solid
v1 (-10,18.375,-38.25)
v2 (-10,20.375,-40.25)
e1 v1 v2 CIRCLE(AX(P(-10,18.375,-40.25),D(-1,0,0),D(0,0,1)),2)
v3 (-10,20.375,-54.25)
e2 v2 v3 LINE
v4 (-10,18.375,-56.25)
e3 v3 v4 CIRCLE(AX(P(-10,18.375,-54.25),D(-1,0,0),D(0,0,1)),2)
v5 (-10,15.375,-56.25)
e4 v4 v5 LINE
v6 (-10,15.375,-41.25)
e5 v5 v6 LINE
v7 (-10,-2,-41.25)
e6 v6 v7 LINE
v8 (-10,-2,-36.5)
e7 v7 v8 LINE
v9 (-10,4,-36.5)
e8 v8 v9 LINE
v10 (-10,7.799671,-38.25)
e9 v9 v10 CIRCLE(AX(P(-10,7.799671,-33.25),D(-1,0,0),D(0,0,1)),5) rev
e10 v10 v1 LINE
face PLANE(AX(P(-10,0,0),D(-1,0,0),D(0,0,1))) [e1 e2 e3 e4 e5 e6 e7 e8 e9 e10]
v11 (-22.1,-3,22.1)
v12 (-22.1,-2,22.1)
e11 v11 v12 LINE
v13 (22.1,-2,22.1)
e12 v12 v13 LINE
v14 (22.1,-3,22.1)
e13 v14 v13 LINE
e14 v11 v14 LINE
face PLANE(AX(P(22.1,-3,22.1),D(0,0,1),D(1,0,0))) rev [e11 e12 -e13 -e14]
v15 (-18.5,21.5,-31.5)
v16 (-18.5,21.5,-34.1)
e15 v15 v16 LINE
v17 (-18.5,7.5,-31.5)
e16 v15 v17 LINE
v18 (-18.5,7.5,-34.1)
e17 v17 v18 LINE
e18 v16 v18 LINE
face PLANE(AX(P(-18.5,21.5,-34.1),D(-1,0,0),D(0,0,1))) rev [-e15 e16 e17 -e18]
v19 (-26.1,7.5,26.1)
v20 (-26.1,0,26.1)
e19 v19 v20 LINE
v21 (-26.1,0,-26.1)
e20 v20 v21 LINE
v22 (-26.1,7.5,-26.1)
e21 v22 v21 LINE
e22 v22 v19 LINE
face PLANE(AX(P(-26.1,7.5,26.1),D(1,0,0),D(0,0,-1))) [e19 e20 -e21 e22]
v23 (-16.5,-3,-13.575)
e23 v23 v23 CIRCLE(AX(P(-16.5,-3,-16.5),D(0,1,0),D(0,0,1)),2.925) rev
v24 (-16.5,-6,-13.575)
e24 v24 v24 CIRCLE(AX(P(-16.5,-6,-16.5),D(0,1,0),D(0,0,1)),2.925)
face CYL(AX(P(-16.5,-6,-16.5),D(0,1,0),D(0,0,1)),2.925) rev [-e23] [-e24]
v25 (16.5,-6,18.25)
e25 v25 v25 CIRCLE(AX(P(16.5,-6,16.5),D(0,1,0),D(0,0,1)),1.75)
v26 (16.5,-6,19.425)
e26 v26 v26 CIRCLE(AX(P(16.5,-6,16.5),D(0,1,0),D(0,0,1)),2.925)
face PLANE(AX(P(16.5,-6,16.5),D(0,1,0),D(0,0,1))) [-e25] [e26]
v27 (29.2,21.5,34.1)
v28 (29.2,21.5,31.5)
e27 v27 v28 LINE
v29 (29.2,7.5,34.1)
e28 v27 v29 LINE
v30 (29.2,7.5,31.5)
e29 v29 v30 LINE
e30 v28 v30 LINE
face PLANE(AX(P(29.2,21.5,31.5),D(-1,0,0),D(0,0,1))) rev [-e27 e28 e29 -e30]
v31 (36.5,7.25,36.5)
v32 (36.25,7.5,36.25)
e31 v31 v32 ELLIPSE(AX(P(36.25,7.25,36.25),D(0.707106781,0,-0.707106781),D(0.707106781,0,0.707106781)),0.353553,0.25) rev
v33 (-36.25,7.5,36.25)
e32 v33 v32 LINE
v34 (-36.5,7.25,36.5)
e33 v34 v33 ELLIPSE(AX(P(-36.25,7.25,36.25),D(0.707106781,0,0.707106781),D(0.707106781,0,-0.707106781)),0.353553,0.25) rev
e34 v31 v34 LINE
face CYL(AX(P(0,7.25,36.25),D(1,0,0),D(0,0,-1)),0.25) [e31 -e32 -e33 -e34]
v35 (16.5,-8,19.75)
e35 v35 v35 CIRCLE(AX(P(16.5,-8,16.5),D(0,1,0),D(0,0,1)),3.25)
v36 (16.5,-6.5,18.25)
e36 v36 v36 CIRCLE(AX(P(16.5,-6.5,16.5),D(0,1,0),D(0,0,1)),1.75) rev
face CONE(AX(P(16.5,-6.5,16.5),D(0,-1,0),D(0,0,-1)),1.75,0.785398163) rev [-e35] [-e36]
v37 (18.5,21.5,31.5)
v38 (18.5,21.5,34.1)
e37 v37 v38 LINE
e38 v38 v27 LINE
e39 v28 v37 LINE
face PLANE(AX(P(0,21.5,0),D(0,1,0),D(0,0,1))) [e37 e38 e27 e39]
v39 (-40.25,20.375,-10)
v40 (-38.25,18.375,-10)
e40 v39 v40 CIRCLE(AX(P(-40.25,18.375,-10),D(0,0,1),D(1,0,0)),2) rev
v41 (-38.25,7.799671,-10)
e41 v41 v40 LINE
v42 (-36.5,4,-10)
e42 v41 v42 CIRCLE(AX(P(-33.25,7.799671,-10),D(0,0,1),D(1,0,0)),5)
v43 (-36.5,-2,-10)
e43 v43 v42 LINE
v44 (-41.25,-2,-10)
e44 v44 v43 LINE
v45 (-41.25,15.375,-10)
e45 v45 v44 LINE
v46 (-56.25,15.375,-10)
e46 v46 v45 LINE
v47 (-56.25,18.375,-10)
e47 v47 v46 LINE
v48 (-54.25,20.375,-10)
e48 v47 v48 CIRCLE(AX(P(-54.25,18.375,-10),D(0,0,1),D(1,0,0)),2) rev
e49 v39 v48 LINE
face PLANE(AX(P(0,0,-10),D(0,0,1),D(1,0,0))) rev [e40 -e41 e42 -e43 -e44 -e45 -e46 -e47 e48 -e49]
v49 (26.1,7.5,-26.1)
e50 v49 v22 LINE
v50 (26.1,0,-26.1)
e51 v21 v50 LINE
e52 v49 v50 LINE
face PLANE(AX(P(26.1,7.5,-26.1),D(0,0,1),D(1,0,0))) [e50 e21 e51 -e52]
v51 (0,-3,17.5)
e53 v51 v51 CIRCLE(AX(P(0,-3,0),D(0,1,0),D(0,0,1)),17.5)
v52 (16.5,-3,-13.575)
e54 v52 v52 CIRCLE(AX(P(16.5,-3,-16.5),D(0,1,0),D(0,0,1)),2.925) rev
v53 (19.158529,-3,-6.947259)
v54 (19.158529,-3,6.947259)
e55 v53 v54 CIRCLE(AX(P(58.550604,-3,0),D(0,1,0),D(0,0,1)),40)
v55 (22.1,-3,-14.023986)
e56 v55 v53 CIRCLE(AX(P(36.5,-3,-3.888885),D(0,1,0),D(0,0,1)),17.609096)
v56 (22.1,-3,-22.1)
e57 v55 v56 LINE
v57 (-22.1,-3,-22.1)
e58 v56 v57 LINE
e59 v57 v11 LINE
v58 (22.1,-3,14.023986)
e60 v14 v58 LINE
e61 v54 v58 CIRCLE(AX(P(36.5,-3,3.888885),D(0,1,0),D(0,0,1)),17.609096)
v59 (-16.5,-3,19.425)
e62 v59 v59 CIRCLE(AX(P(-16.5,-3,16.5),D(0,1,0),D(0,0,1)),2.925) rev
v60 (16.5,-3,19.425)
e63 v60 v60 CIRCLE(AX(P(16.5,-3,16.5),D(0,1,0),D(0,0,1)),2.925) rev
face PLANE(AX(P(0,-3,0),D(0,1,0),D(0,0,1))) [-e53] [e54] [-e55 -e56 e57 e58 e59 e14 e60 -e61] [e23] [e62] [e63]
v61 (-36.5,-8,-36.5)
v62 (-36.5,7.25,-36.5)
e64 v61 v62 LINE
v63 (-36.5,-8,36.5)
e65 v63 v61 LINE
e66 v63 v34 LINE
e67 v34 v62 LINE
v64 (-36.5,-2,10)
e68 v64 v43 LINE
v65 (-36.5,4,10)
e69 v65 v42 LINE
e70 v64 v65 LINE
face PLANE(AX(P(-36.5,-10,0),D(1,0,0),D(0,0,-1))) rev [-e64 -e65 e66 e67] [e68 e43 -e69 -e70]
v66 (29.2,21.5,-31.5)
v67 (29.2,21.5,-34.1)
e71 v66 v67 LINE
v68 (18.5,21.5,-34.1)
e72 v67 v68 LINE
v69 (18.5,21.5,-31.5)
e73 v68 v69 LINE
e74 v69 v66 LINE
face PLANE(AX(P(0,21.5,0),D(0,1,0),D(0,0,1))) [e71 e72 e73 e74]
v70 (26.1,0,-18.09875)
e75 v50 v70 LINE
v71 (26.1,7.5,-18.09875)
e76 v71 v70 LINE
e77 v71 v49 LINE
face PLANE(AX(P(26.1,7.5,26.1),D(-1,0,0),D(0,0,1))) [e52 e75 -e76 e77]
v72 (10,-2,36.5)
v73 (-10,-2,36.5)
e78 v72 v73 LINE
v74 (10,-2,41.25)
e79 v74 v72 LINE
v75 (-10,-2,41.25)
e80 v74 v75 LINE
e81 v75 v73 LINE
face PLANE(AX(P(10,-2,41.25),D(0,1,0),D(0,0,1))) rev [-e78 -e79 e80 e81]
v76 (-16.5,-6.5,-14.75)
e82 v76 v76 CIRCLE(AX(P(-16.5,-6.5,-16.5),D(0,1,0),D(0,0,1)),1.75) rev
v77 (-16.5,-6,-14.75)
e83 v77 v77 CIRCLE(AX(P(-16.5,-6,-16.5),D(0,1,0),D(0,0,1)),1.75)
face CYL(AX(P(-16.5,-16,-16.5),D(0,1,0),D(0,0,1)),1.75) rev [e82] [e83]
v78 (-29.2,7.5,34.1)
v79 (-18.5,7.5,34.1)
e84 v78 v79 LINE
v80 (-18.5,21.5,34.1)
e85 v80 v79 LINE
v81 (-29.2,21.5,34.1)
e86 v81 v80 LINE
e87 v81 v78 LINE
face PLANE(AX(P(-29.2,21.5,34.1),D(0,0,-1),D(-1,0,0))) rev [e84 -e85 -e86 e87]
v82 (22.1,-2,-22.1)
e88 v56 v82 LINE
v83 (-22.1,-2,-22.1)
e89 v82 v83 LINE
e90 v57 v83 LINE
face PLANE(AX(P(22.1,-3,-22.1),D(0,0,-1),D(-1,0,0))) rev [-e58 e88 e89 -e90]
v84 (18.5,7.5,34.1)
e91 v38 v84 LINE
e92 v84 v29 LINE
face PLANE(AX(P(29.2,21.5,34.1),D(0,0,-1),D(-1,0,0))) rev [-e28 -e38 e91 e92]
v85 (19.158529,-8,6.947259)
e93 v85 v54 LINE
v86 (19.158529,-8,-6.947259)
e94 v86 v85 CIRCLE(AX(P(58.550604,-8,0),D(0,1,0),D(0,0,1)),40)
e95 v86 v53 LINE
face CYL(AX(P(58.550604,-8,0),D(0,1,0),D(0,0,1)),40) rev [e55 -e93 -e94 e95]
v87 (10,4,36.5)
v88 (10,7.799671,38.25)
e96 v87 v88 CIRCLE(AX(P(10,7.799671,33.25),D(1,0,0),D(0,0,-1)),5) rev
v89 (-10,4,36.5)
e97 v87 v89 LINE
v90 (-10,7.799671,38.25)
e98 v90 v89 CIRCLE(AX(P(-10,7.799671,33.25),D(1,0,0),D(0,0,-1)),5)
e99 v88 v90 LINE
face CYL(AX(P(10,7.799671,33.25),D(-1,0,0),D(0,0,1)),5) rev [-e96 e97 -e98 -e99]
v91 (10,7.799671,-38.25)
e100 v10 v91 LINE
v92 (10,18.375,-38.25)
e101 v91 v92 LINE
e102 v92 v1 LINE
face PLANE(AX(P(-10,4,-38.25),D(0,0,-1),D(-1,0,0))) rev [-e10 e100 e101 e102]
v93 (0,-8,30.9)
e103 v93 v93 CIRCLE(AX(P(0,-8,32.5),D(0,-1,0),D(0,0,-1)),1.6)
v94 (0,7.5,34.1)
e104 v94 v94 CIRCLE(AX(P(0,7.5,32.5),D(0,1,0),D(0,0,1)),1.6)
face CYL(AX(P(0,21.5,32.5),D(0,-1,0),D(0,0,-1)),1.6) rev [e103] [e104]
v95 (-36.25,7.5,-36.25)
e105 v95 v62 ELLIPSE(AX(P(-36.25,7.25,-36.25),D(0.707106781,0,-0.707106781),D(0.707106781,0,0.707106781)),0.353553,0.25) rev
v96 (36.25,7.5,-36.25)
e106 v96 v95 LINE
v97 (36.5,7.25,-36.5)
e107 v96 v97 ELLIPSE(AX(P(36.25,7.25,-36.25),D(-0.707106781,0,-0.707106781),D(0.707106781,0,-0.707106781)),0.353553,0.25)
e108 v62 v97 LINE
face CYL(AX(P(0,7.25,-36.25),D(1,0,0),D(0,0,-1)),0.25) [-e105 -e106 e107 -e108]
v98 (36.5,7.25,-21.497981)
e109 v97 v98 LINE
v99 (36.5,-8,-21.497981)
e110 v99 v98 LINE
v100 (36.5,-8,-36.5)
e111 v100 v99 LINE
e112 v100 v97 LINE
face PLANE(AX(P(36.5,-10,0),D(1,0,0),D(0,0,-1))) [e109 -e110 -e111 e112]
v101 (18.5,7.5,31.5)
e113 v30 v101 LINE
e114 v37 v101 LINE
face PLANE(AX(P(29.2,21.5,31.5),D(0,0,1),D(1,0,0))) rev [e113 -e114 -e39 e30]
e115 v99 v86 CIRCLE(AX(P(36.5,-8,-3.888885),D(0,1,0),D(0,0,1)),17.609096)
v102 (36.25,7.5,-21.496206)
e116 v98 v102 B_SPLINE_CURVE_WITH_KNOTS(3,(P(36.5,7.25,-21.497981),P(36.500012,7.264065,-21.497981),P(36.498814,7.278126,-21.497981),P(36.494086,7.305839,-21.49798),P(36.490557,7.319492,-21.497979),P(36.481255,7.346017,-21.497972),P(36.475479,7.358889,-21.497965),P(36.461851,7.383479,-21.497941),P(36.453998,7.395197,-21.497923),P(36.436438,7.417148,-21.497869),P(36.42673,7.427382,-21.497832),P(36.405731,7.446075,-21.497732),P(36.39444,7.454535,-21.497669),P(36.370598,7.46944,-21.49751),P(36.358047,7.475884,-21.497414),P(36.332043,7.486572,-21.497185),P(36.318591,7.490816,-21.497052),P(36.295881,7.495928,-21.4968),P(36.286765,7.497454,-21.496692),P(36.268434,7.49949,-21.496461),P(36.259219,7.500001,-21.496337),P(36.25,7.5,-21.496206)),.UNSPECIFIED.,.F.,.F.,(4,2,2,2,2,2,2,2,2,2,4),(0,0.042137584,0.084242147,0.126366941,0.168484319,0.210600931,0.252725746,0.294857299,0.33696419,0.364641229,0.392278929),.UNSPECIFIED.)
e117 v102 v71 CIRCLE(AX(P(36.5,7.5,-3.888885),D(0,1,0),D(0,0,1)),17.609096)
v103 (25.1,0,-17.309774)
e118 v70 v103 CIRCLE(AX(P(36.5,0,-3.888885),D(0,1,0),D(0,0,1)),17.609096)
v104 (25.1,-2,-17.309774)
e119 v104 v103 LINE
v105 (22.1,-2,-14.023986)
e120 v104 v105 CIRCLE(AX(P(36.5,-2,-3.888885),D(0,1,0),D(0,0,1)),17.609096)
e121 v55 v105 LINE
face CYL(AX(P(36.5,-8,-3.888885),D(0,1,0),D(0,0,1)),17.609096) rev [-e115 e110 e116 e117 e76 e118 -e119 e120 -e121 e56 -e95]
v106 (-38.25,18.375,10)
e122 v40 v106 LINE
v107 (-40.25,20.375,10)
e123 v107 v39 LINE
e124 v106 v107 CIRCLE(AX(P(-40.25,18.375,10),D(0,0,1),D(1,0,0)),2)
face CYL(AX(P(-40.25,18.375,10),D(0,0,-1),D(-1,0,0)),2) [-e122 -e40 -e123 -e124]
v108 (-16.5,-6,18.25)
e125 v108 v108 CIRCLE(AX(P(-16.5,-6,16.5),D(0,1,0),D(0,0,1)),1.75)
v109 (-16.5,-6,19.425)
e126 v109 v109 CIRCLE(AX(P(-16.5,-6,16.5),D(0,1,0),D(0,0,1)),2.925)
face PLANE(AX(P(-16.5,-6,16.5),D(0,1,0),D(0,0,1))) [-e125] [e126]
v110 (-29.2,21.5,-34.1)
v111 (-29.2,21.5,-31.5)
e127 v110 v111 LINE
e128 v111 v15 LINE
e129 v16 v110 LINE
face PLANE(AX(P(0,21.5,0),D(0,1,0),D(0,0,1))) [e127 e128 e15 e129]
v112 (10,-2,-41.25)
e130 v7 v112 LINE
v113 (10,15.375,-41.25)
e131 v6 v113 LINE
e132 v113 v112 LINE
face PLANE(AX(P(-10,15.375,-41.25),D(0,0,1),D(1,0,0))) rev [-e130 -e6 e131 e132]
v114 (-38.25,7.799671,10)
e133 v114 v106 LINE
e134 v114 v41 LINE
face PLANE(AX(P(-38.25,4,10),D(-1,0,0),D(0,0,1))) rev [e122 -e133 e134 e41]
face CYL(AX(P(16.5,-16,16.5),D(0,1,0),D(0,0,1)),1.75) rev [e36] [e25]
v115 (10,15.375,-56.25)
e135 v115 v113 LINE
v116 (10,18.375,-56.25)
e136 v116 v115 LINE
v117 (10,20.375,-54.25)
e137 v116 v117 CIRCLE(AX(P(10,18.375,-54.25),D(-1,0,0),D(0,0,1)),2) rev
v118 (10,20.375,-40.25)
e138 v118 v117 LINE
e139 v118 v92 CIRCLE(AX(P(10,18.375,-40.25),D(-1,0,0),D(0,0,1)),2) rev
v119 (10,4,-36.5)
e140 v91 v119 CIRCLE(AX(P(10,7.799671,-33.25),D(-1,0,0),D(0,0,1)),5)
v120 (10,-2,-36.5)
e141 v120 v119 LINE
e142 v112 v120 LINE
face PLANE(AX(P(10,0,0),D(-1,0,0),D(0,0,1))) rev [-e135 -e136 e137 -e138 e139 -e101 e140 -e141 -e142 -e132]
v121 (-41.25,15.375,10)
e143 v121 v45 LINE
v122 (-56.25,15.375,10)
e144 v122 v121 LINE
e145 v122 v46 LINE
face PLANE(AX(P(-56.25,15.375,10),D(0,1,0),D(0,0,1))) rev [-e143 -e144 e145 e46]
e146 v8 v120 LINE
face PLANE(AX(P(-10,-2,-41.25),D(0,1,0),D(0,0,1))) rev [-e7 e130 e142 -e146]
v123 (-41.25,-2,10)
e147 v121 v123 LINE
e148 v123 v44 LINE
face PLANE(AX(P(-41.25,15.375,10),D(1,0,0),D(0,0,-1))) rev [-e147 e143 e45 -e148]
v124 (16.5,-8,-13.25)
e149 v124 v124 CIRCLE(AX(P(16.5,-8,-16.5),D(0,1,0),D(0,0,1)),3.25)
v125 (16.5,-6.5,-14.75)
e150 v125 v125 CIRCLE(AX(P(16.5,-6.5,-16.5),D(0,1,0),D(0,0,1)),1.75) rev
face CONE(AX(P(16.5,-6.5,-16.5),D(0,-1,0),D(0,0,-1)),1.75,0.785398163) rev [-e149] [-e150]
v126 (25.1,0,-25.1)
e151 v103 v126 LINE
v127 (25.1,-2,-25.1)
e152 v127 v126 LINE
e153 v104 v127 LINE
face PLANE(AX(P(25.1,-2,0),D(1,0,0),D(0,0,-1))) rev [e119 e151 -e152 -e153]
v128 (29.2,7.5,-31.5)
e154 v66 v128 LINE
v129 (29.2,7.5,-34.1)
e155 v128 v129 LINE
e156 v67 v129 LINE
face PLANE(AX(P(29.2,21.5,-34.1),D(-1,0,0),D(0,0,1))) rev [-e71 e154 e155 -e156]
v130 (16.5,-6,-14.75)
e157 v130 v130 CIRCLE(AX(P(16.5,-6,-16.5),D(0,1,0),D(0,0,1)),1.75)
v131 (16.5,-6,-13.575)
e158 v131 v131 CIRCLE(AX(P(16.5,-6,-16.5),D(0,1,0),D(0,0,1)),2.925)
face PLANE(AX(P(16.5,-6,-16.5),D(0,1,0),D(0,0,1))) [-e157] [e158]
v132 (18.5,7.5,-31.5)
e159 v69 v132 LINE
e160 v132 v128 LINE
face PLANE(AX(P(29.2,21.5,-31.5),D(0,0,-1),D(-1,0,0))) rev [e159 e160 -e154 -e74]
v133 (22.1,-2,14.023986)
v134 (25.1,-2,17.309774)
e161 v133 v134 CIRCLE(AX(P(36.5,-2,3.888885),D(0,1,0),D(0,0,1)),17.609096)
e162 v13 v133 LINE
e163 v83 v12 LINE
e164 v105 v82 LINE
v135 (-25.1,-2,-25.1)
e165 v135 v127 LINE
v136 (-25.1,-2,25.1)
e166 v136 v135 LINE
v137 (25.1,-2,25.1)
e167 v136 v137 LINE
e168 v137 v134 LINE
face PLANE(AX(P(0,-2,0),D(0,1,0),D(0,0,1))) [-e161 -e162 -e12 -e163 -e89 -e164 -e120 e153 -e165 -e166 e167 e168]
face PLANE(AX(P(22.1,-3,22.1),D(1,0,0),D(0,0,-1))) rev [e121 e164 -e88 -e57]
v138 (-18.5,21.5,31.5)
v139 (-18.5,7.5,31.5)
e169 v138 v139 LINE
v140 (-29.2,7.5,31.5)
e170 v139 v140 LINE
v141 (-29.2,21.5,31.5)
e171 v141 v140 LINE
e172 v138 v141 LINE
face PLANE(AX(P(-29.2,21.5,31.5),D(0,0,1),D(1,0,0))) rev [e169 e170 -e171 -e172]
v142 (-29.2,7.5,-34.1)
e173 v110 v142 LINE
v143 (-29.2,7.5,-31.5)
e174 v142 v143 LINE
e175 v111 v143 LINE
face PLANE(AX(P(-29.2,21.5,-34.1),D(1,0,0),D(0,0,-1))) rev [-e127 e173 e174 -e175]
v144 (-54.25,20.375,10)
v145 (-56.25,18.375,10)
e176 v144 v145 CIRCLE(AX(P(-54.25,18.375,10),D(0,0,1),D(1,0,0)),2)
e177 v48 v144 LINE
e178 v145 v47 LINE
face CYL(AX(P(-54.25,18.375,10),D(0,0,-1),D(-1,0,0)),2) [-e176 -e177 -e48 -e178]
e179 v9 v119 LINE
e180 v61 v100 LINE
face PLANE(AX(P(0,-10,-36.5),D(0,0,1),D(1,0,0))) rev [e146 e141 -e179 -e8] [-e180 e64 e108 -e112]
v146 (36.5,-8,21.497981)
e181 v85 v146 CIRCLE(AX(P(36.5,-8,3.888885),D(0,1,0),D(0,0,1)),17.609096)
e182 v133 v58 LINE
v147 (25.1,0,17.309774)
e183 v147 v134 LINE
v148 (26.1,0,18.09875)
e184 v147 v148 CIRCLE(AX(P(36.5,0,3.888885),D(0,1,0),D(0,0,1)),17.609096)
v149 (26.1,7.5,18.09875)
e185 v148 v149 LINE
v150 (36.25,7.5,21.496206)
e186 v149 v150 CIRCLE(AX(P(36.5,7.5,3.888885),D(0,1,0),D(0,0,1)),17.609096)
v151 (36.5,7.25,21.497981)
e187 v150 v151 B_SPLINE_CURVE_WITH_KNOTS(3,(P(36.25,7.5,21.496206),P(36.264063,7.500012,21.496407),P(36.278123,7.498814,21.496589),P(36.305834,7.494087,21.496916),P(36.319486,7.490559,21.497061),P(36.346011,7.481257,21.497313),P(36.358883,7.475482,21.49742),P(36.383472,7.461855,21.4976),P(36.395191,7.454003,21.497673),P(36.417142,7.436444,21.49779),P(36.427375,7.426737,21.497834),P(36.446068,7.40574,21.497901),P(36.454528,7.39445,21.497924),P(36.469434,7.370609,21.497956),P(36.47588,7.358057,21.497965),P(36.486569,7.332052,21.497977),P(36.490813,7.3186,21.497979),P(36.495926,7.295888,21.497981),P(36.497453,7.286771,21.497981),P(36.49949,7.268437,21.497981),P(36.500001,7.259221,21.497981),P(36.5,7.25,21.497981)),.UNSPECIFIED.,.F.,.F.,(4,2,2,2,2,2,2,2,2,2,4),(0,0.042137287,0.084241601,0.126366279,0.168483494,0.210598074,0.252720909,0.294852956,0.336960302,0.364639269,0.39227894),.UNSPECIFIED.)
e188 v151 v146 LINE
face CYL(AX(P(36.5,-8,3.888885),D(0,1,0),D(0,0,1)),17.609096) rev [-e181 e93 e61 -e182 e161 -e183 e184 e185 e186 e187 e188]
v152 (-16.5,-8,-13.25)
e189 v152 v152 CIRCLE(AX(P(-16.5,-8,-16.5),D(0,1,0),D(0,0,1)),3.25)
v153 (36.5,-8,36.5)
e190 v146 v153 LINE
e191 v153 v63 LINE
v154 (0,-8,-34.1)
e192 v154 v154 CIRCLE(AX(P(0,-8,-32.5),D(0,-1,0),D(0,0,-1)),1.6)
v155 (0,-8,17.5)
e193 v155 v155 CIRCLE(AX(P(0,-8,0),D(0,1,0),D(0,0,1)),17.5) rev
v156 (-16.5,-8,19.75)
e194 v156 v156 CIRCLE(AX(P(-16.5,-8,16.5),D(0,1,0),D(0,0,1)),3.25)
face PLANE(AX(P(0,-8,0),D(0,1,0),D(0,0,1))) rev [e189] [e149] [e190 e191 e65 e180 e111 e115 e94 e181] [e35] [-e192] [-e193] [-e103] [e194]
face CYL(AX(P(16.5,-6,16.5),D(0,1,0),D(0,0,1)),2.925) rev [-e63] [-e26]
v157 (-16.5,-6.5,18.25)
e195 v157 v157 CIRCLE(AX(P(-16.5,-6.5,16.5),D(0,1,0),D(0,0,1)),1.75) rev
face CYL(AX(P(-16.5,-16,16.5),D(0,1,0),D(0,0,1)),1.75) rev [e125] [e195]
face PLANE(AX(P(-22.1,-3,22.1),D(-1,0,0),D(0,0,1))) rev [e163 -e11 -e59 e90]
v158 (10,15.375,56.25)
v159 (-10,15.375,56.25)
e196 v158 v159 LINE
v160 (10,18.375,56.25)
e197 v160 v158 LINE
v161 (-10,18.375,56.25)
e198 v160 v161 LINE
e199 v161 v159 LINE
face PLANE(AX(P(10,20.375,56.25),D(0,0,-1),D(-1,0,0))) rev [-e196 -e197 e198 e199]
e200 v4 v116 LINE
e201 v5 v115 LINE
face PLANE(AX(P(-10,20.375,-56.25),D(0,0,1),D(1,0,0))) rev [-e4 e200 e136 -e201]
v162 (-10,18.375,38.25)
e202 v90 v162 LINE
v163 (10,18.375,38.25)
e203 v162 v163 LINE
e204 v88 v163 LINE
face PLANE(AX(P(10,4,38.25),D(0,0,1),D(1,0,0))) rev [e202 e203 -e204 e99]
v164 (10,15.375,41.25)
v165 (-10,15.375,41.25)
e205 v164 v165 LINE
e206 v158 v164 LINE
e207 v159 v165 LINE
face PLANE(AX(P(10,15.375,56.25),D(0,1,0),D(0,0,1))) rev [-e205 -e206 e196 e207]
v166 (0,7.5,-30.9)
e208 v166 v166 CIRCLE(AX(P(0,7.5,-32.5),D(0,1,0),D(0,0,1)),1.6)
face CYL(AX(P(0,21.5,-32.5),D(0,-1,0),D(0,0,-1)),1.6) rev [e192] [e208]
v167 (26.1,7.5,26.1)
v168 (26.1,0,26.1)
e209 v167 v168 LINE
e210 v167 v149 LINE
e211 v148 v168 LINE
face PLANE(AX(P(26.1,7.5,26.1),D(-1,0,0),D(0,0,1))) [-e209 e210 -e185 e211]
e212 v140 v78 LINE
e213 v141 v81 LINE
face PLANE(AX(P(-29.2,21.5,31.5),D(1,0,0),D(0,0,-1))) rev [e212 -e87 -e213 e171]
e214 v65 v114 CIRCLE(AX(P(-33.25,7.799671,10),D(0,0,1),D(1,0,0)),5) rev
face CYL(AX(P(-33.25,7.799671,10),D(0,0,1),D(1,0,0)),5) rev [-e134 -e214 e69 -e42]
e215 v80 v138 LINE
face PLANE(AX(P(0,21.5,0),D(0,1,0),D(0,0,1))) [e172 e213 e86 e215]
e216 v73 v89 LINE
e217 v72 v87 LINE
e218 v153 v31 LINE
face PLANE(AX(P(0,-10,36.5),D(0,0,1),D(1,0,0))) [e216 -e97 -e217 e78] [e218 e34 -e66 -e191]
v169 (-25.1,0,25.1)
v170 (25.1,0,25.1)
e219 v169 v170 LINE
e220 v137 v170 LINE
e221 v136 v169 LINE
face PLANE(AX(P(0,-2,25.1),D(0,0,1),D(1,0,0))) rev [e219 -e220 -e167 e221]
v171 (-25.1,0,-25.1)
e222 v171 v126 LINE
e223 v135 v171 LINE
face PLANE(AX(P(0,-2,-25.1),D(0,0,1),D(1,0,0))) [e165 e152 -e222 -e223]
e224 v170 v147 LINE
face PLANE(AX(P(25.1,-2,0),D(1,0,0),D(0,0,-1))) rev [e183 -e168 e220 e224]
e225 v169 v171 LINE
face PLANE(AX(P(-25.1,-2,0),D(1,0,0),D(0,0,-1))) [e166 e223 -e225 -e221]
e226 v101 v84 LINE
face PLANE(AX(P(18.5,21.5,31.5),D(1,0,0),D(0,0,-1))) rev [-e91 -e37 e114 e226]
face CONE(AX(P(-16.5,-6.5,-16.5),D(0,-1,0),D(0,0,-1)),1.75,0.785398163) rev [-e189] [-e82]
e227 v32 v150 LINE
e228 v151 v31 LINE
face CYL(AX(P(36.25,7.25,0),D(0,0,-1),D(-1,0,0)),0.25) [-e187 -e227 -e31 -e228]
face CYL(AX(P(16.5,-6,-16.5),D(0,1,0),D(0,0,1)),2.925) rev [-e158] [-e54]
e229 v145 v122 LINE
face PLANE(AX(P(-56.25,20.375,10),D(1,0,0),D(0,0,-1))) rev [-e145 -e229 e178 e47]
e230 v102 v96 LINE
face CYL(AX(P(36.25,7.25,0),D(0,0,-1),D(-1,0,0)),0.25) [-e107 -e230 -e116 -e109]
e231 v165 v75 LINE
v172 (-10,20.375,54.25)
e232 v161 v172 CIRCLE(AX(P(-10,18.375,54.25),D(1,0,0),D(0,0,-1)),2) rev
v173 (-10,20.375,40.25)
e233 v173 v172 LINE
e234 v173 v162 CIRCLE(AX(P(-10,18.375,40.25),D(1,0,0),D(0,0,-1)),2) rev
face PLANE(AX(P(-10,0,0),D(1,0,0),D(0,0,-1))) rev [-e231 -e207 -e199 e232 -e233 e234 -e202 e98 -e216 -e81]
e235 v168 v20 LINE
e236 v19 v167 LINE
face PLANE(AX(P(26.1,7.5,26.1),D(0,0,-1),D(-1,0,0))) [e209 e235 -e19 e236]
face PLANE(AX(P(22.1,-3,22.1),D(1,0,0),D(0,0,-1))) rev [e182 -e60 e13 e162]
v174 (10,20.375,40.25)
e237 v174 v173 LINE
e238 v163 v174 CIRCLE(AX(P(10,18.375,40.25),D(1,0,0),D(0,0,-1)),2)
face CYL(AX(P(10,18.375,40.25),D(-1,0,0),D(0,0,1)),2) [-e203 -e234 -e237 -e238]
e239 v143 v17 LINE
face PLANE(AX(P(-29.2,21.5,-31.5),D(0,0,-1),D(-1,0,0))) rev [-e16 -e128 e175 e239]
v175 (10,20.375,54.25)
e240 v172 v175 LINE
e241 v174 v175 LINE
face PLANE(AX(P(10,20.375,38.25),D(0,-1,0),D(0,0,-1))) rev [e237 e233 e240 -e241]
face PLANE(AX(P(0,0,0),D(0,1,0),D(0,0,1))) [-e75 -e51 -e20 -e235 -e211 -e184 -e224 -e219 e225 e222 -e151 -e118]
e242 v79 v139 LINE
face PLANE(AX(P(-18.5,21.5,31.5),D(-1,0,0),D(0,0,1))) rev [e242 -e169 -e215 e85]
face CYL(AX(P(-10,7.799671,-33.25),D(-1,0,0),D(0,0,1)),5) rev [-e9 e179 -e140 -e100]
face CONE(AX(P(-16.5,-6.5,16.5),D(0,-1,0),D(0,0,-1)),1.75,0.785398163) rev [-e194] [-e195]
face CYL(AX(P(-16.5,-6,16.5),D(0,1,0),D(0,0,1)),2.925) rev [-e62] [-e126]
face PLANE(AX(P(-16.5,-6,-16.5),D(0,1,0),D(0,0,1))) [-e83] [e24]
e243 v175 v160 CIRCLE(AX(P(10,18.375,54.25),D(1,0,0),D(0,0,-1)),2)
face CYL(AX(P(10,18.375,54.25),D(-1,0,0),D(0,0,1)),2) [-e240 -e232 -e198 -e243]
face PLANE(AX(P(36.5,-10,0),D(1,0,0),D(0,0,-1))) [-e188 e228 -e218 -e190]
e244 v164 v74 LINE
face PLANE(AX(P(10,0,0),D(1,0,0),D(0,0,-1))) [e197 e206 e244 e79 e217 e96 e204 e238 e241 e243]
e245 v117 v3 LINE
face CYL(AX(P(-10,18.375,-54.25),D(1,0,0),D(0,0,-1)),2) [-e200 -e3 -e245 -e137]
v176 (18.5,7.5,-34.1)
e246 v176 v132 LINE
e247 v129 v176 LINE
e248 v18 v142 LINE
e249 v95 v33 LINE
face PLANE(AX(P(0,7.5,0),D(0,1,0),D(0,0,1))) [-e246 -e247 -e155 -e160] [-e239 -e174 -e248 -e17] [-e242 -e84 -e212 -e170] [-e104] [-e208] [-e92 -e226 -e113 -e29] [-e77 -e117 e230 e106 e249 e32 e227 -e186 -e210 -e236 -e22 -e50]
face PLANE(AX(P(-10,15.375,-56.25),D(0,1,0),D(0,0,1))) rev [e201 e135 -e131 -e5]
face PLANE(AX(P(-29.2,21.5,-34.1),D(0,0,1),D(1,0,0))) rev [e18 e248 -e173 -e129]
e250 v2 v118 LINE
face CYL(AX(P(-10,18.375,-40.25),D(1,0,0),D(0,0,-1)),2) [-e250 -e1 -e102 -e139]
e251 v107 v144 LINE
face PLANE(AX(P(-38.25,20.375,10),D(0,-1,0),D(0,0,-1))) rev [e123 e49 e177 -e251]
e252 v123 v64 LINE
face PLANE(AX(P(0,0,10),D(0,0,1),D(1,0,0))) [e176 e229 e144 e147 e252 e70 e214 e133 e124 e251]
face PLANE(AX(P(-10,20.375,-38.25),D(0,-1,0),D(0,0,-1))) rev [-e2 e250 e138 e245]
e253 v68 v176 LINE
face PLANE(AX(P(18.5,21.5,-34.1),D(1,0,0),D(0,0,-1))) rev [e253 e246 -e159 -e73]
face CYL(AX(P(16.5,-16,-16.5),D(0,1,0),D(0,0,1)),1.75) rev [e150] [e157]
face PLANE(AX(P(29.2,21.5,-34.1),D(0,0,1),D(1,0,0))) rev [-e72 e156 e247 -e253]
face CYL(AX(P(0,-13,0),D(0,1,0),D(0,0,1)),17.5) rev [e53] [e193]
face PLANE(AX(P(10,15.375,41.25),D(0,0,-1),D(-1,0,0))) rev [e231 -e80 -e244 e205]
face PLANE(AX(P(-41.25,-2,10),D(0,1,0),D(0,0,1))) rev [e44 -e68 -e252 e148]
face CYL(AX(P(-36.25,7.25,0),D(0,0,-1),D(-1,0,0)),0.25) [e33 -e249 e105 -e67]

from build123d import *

# Parameters (mm, degrees)
SKETCH3_W           = 73
SKETCH3_H           = 73
BOSS_EXTRUDE3_DEPTH = 10
SKETCH3_3_W         = 50.2
SKETCH3_3_H         = 50.2
CUT_EXTRUDE2_DEPTH  = 2
SKETCH4_R           = 2.925
CUT_EXTRUDE3_DEPTH  = 4
SKETCH13_R          = 1.75
CUT_EXTRUDE6_DEPTH  = 10
SKETCH5_W           = 44.2
SKETCH5_H           = 44.2
CUT_EXTRUDE4_DEPTH  = 1
SKETCH7_W           = 73
SKETCH7_H           = 73
SKETCH7_W_2         = 52.2
SKETCH7_H_2         = 52.2
BOSS_EXTRUDE5_DEPTH = 9.5
SKETCH8_W           = 10.7
SKETCH8_H           = 2.6
BOSS_EXTRUDE6_DEPTH = 14
FILLET1_R           = 0.25
SKETCH9_R           = 17.5
CUT_EXTRUDE5_DEPTH  = 10
BOSS_EXTRUDE7_DEPTH = 10
FILLET2_R           = 5
FILLET2_R_2         = 2
SKETCH15_W          = 73
SKETCH15_H          = 73
REBAIX_DEPTH        = 2
CUT_EXTRUDE11_START = -15.5
CUT_EXTRUDE11_DEPTH = 15.5
SKETCH19_R          = 1.6
CUT_EXTRUDE12_DEPTH = 85.84323793
CHAMFER1_SIZE       = 1.5


with BuildPart() as part:
    # Sketch3 → Boss-Extrude3 (new body)
    with BuildSketch(Plane(origin=(0, 0, 0), x_dir=(1, 0, 0), z_dir=(0, 1, 0))):
        Rectangle(SKETCH3_W, SKETCH3_H)
    extrude(amount=-BOSS_EXTRUDE3_DEPTH)

    # Sketch3<3> → Cut-Extrude2 (cut)
    with BuildSketch(Plane(origin=(0, 0, 0), x_dir=(1, 0, 0), z_dir=(0, 1, 0))):
        Rectangle(SKETCH3_3_W, SKETCH3_3_H)
    extrude(amount=-CUT_EXTRUDE2_DEPTH, mode=Mode.SUBTRACT)

    # Sketch4 → Cut-Extrude3 (cut)
    with BuildSketch(Plane(origin=(0, -2, 0), x_dir=(1, 0, 0), z_dir=(0, 1, 0))):
        with Locations(Location((-16.5, 16.5, 0), (0, 0, 270))):
            Circle(SKETCH4_R)
        with Locations(Location((16.5, 16.5, 0), (0, 0, 270))):
            Circle(SKETCH4_R)
        with Locations(Location((-16.5, -16.5, 0), (0, 0, 270))):
            Circle(SKETCH4_R)
        with Locations(Location((16.5, -16.5, 0), (0, 0, 270))):
            Circle(SKETCH4_R)
    extrude(amount=-CUT_EXTRUDE3_DEPTH, mode=Mode.SUBTRACT)

    # Sketch13 → Cut-Extrude6 (cut)
    with BuildSketch(Plane(origin=(0, -6, 0), x_dir=(1, 0, 0), z_dir=(0, 1, 0))):
        with Locations(Location((16.5, 16.5, 0), (0, 0, 270))):
            Circle(SKETCH13_R)
        with Locations(Location((16.5, -16.5, 0), (0, 0, 270))):
            Circle(SKETCH13_R)
        with Locations(Location((-16.5, -16.5, 0), (0, 0, 270))):
            Circle(SKETCH13_R)
        with Locations(Location((-16.5, 16.5, 0), (0, 0, 270))):
            Circle(SKETCH13_R)
    extrude(amount=-CUT_EXTRUDE6_DEPTH, mode=Mode.SUBTRACT)

    # Sketch5 → Cut-Extrude4 (cut)
    with BuildSketch(Plane(origin=(0, -2, 0), x_dir=(1, 0, 0), z_dir=(0, 1, 0))):
        Rectangle(SKETCH5_W, SKETCH5_H)
    extrude(amount=-CUT_EXTRUDE4_DEPTH, mode=Mode.SUBTRACT)

    # Sketch7 → Boss-Extrude5 (add)
    with BuildSketch(Plane(origin=(0, -2, 0), x_dir=(1, 0, 0), z_dir=(0, 1, 0))):
        Rectangle(SKETCH7_W, SKETCH7_H)
        Rectangle(SKETCH7_W_2, SKETCH7_H_2, mode=Mode.SUBTRACT)
    extrude(amount=BOSS_EXTRUDE5_DEPTH)

    # Sketch8 → Boss-Extrude6 (add)
    with BuildSketch(Plane(origin=(0, 7.5, 0), x_dir=(1, 0, 0), z_dir=(0, 1, 0))):
        with Locations((-23.85, 32.8)):
            Rectangle(SKETCH8_W, SKETCH8_H)
        with Locations((-23.85, -32.8)):
            Rectangle(SKETCH8_W, SKETCH8_H)
        with Locations((23.85, 32.8)):
            Rectangle(SKETCH8_W, SKETCH8_H)
        with Locations((23.85, -32.8)):
            Rectangle(SKETCH8_W, SKETCH8_H)
    extrude(amount=BOSS_EXTRUDE6_DEPTH)

    # Fillet1
    fillet1_edges = [part.edges().sort_by_distance(p)[0] for p in [
        (-36.5, 7.5, 0),
        (0, 7.5, 36.5),
        (36.5, 7.5, 0),
        (0, 7.5, -36.5),
    ]]
    fillet(fillet1_edges, radius=FILLET1_R)

    # Sketch9 → Cut-Extrude5 (cut)
    with BuildSketch(Plane(origin=(0, -3, 0), x_dir=(1, 0, 0), z_dir=(0, 1, 0))):
        with Locations(Location((0, 0, 0), (0, 0, 270))):
            Circle(SKETCH9_R)
    extrude(amount=-CUT_EXTRUDE5_DEPTH, mode=Mode.SUBTRACT)

    # Sketch10 → Boss-Extrude7 (add, symmetric)
    with BuildSketch(Plane(origin=(0, 0, 0), x_dir=(0, 0, -1), z_dir=(1, 0, 0))):
        Polygon((-36.5, -2), (-36.5, 4), (-38.25, 4), (-38.25, 20.375), (-56.25, 20.375), (-56.25, 15.375), (-41.25, 15.375), (-41.25, -2), align=None)
    extrude(amount=BOSS_EXTRUDE7_DEPTH, both=True)

    # Fillet2
    # the kernel refuses this fillet: 5, 2 mm, written as the material it adds along each edge
    with BuildSketch(Plane(origin=(-10, 4, 38.25), x_dir=(0, 0, -1), z_dir=(1, 0, 0))) as fillet2_piece_1:
        with BuildLine():
            CenterArc((5, 3.799671038), FILLET2_R, 180, 49.458398126)
            Line((0, 3.799671038), (0, 0))
            Line((0, 0), (1.75, 0))
        make_face()
    extrude(amount=20)
    # the kernel refuses this fillet: 5, 2 mm, written as the material it takes off along each edge
    with BuildSketch(Plane(origin=(-15, 20.375, 56.25), x_dir=(0, 0, -1), z_dir=(1, 0, 0)), Plane(origin=(-15, 20.375, 38.25), x_dir=(0, -1, 0), z_dir=(1, 0, 0))) as fillet2_2_piece_1:
        with BuildLine():
            CenterArc((FILLET2_R_2, -FILLET2_R_2), FILLET2_R_2, 90, 90)
            Line((0, -FILLET2_R_2), (0, 0))
            Line((0, 0), (FILLET2_R_2, 0))
        make_face()
    extrude(amount=30, mode=Mode.SUBTRACT)

    # CirPattern1: read off the stored shape, not the designer's step
    # CirPattern1: loft between two sections, ruled curve by curve
    cirpattern1_from = [
        Edge.make_three_point_arc((-38.25, 7.799671038, -10), (-37.791475531, 5.708020972, -10), (-36.5, 4, -10)),
        Edge.make_three_point_arc((-40.25, 20.375, -10), (-38.835786438, 19.789213562, -10), (-38.25, 18.375, -10)),
        Edge.make_three_point_arc((-56.25, 18.375, -10), (-55.664213562, 19.789213562, -10), (-54.25, 20.375, -10)),
        Edge.make_line((-41.25, -2, -10), (-36.5, -2, -10)),
        Edge.make_line((-40.25, 20.375, -10), (-54.25, 20.375, -10)),
        Edge.make_line((-56.25, 15.375, -10), (-41.25, 15.375, -10)),
        Edge.make_line((-41.25, 15.375, -10), (-41.25, -2, -10)),
        Edge.make_line((-38.25, 7.799671038, -10), (-38.25, 18.375, -10)),
        Edge.make_line((-56.25, 18.375, -10), (-56.25, 15.375, -10)),
        Edge.make_line((-36.5, -2, -10), (-36.5, 4, -10)),
    ]
    cirpattern1_to = [
        Edge.make_three_point_arc((-38.25, 7.799671038, 10), (-37.791475531, 5.708020972, 10), (-36.5, 4, 10)),
        Edge.make_three_point_arc((-40.25, 20.375, 10), (-38.835786438, 19.789213562, 10), (-38.25, 18.375, 10)),
        Edge.make_three_point_arc((-56.25, 18.375, 10), (-55.664213562, 19.789213562, 10), (-54.25, 20.375, 10)),
        Edge.make_line((-41.25, -2, 10), (-36.5, -2, 10)),
        Edge.make_line((-40.25, 20.375, 10), (-54.25, 20.375, 10)),
        Edge.make_line((-56.25, 15.375, 10), (-41.25, 15.375, 10)),
        Edge.make_line((-41.25, 15.375, 10), (-41.25, -2, 10)),
        Edge.make_line((-38.25, 7.799671038, 10), (-38.25, 18.375, 10)),
        Edge.make_line((-56.25, 18.375, 10), (-56.25, 15.375, 10)),
        Edge.make_line((-36.5, -2, 10), (-36.5, 4, 10)),
    ]
    cirpattern1 = Solid(Shell([*[Face.make_surface_from_curves(cirpattern1_from[k], cirpattern1_to[k]) for k in range(10)], Face(Wire(cirpattern1_from)), Face(Wire(cirpattern1_to))]))
    add(cirpattern1)

    # CirPattern1 2: loft between two sections, ruled curve by curve
    cirpattern1_2_from = [
        Edge.make_three_point_arc((10, 7.799671038, -38.25), (10, 5.708020972, -37.791475531), (10, 4, -36.5)),
        Edge.make_three_point_arc((10, 20.375, -40.25), (10, 19.789213562, -38.835786438), (10, 18.375, -38.25)),
        Edge.make_three_point_arc((10, 18.375, -56.25), (10, 19.789213562, -55.664213562), (10, 20.375, -54.25)),
        Edge.make_line((10, -2, -41.25), (10, -2, -36.5)),
        Edge.make_line((10, 20.375, -40.25), (10, 20.375, -54.25)),
        Edge.make_line((10, 15.375, -56.25), (10, 15.375, -41.25)),
        Edge.make_line((10, 15.375, -41.25), (10, -2, -41.25)),
        Edge.make_line((10, 7.799671038, -38.25), (10, 18.375, -38.25)),
        Edge.make_line((10, 18.375, -56.25), (10, 15.375, -56.25)),
        Edge.make_line((10, -2, -36.5), (10, 4, -36.5)),
    ]
    cirpattern1_2_to = [
        Edge.make_three_point_arc((-10, 7.799671038, -38.25), (-10, 5.708020972, -37.791475531), (-10, 4, -36.5)),
        Edge.make_three_point_arc((-10, 20.375, -40.25), (-10, 19.789213562, -38.835786438), (-10, 18.375, -38.25)),
        Edge.make_three_point_arc((-10, 18.375, -56.25), (-10, 19.789213562, -55.664213562), (-10, 20.375, -54.25)),
        Edge.make_line((-10, -2, -41.25), (-10, -2, -36.5)),
        Edge.make_line((-10, 20.375, -40.25), (-10, 20.375, -54.25)),
        Edge.make_line((-10, 15.375, -56.25), (-10, 15.375, -41.25)),
        Edge.make_line((-10, 15.375, -41.25), (-10, -2, -41.25)),
        Edge.make_line((-10, 7.799671038, -38.25), (-10, 18.375, -38.25)),
        Edge.make_line((-10, 18.375, -56.25), (-10, 15.375, -56.25)),
        Edge.make_line((-10, -2, -36.5), (-10, 4, -36.5)),
    ]
    cirpattern1_2 = Solid(Shell([*[Face.make_surface_from_curves(cirpattern1_2_from[k], cirpattern1_2_to[k]) for k in range(10)], Face(Wire(cirpattern1_2_from)), Face(Wire(cirpattern1_2_to))]))
    add(cirpattern1_2)

    # Sketch15 → rebaix (cut)
    with BuildSketch(Plane.XZ.offset(10)):
        Rectangle(SKETCH15_W, SKETCH15_H)
    extrude(amount=-REBAIX_DEPTH, mode=Mode.SUBTRACT)

    # Cut-Extrude11: read off the stored shape, not the designer's step
    # Cut-Extrude11 outline → Cut-Extrude11 (cut)
    with BuildSketch(Plane(origin=(0, 7.5, 0), x_dir=(1, 0, 0), z_dir=(0, 1, 0)).offset(CUT_EXTRUDE11_START)):
        with BuildLine():
            ThreePointArc((19.158528942, 6.947258634), (18.550604255, 0), (19.158528942, -6.947258634))
            ThreePointArc((19.158528942, -6.947258634), (25.181319297, -17.378426685), (36.500000379, -21.497981165))
            Line((36.500000379, -21.497981165), (36.500002527, 21.497981165))
            ThreePointArc((36.500002527, 21.497981165), (25.181320119, 17.378427376), (19.158528942, 6.947258634))
        make_face()
    extrude(amount=CUT_EXTRUDE11_DEPTH, mode=Mode.SUBTRACT)

    # Sketch19 → Cut-Extrude12 (cut, through all)
    with BuildSketch(Plane(origin=(0, -8, 0), x_dir=(-1, 0, 0), z_dir=(0, -1, 0))):
        with Locations(Location((0, -32.5, 0), (0, 0, 90))):
            Circle(SKETCH19_R)
        with Locations(Location((0, 32.5, 0), (0, 0, 90))):
            Circle(SKETCH19_R)
    extrude(amount=-CUT_EXTRUDE12_DEPTH, mode=Mode.SUBTRACT)

    # Chamfer1
    chamfer1_edges = [part.edges().sort_by_distance(p)[0] for p in [
        (16.5, -8, 14.75),
        (-16.5, -8, -18.25),
        (-16.5, -8, 14.75),
        (16.5, -8, -18.25),
    ]]
    chamfer(chamfer1_edges, length=CHAMFER1_SIZE)


solid = part.part
